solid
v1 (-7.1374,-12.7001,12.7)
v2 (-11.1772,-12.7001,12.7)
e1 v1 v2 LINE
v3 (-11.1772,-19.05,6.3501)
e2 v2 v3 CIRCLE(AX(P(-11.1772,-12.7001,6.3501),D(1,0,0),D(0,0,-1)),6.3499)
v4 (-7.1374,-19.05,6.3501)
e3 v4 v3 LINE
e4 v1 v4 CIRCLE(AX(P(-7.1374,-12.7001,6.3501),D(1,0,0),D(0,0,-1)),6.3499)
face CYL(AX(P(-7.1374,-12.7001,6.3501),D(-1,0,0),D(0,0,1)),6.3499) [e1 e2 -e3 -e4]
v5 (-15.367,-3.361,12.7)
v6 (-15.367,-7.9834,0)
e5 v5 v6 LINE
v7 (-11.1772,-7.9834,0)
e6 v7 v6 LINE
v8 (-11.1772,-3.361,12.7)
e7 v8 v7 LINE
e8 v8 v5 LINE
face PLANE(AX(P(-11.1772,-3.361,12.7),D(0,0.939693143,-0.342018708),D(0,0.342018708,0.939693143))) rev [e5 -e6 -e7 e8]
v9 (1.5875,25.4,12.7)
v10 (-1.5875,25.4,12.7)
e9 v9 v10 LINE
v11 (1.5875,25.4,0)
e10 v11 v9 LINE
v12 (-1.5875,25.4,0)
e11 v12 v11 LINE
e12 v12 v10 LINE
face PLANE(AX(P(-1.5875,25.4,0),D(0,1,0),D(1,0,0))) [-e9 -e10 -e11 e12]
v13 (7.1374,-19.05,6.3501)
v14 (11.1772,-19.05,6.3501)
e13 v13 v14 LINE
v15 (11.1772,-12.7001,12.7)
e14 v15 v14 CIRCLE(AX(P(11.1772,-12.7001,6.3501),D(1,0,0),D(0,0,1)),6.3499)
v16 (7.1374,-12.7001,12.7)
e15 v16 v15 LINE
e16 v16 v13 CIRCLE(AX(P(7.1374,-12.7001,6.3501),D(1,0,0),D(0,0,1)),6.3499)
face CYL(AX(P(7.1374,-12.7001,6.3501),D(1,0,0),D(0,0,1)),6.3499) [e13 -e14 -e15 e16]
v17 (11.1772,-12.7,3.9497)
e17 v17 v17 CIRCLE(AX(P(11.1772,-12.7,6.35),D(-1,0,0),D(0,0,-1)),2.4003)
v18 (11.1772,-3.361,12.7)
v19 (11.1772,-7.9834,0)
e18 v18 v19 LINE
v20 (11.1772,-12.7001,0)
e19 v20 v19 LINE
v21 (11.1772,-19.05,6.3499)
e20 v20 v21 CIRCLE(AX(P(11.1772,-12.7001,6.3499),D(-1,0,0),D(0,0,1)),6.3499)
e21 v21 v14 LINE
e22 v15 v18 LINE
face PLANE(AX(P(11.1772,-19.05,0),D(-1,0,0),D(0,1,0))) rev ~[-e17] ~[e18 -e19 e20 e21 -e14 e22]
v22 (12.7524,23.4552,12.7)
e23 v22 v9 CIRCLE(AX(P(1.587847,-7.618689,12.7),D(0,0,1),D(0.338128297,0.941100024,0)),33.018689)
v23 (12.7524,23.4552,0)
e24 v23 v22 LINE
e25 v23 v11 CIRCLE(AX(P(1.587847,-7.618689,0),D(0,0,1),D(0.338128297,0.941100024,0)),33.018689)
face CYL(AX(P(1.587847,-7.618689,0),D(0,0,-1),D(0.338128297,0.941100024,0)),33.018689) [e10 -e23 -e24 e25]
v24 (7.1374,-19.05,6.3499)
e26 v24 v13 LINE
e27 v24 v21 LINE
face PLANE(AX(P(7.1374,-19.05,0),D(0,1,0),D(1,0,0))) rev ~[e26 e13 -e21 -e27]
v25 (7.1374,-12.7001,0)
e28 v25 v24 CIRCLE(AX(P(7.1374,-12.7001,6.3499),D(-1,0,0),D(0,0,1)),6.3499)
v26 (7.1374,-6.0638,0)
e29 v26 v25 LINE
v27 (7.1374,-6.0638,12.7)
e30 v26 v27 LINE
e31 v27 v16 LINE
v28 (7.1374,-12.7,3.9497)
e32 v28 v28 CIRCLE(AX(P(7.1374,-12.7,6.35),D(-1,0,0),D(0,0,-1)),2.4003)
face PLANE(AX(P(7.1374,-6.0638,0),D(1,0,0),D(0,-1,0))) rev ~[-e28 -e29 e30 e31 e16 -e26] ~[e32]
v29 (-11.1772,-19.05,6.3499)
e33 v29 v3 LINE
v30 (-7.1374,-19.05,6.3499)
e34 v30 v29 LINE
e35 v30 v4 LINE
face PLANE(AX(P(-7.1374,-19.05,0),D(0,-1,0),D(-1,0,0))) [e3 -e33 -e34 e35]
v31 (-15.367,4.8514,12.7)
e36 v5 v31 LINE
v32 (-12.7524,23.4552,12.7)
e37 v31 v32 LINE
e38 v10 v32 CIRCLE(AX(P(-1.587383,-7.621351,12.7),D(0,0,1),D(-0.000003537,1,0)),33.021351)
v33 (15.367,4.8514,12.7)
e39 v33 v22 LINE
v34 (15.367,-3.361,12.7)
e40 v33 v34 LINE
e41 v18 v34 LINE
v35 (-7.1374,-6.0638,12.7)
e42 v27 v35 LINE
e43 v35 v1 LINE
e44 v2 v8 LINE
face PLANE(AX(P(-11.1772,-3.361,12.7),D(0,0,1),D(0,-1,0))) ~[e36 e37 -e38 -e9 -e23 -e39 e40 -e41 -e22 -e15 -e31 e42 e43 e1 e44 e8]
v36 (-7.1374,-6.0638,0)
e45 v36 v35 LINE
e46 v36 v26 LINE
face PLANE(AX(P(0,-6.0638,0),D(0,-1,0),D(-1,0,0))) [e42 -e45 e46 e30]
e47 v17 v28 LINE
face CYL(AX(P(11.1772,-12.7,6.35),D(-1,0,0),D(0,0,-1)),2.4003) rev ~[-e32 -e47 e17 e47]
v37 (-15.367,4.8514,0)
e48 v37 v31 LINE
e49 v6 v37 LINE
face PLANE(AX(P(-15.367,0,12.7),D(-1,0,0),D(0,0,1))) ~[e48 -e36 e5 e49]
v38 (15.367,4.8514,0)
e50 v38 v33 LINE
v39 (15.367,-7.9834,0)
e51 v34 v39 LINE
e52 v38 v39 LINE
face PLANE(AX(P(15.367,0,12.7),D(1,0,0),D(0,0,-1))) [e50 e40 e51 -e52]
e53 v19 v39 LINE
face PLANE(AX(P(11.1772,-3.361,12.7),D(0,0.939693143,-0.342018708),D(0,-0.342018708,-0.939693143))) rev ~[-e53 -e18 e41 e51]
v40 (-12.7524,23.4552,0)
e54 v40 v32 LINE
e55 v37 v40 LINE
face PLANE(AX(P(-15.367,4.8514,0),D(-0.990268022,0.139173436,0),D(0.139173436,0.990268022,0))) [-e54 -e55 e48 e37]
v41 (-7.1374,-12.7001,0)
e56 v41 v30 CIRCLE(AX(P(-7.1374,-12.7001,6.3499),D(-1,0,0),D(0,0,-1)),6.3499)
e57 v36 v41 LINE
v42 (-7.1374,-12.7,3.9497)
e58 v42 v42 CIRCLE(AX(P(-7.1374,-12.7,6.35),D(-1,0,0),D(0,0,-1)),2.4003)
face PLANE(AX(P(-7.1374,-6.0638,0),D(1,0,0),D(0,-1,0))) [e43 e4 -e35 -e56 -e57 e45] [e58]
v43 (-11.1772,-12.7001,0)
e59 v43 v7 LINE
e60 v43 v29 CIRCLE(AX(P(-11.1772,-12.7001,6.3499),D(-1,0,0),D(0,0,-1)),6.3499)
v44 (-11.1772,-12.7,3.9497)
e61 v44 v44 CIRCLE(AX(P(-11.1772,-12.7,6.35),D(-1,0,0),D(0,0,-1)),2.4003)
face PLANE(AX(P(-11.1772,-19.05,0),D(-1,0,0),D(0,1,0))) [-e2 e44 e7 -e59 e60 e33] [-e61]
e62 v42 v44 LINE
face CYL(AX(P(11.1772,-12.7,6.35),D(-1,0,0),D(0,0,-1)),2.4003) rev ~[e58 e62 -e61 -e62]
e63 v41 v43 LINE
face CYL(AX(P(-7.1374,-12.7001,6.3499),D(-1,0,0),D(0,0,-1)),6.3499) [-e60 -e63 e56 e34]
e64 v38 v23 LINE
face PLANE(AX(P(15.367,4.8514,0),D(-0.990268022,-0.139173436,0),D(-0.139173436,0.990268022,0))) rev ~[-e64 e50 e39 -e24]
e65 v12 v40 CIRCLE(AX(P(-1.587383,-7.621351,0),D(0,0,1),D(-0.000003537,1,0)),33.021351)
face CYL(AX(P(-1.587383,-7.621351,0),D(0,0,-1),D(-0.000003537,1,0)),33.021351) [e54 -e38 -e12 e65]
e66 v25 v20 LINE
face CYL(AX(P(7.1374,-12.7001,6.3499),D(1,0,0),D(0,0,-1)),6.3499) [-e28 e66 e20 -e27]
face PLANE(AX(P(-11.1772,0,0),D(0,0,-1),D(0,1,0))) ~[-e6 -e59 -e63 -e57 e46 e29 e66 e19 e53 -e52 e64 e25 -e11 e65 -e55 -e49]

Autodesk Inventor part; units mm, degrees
ref_plane "YZ Plane" through (0, 0, 0) normal (1, 0, 0) x (0, 1, 0)
ref_plane "XY Plane" through (0, 0, 0) normal (0, 0, 1) x (1, 0, 0)
sketch "Sketch1" plane through (0, 0, 0) normal (0, 0, 1) x (1, 0, 0)
  line L0 (0, -6.0638) -> (7.1374, -6.0638)
  line L1 (7.1374, -6.0638) -> (7.1374, -19.05)
  line L2 (7.1374, -19.05) -> (11.1772, -19.05)
  line L3 (11.1772, -19.05) -> (11.1772, 0)
  line L4 (11.1772, 0) -> (15.367, 0)
  line L5 (15.367, 0) -> (15.367, 4.8514)
  line L6 (15.367, 4.8514) -> (12.7524, 23.4552)
  arc A0 (12.7524, 23.4552) -> (1.5875, 25.4) centre (1.5875, -7.62) ccw
  line L7 (-21.5138, 0) -> (21.5138, 0) construction
  line L8 (0, -28.0365) -> (0, 34.8691) construction
  line L9 (0, -6.0638) -> (-7.1374, -6.0638)
  line L10 (-7.1374, -6.0638) -> (-7.1374, -19.05)
  line L11 (-7.1374, -19.05) -> (-11.1772, -19.05)
  line L12 (-11.1772, -19.05) -> (-11.1772, 0)
  line L13 (-11.1772, 0) -> (-15.367, 0)
  line L14 (-15.367, 0) -> (-15.367, 4.8514)
  line L15 (-15.367, 4.8514) -> (-12.7524, 23.4552)
  line L16 (7.1374, -12.7) -> (11.1772, -12.7) construction
  line L17 (-7.1374, -12.7) -> (-11.1772, -12.7) construction
  line L18 (1.5875, 25.4) -> (0, 25.4)
  arc A1 (-1.5875, 25.4) -> (-12.7524, 23.4552) centre (-1.5875, -7.62) ccw
  line L19 (-1.5875, 25.4) -> (0, 25.4)
  point P0 (0, 0)
  dimension "d1" = 30.734
  dimension "d2" = 4.1898
  dimension "d3" = 4.0398
  dimension "d4" = 6.35
  dimension "d5" = 12.7
  dimension "d6" = 17.5514
  dimension "d7" = 8
  dimension "d8" = 1.5875
  dimension "d9" = 38.1
  dimension "d10" = 33.02
extrude "Extrusion1" add sketch "Sketch1" along normal blind 12.7
hole "Hole1" at (11.1772, -12.7, 6.35) direction (-1, 0, 0) diameter 4.8006 end through all
fillet "Fillet1" radius 6.35 4 edges at (9.1573, -19.05, 12.7) (9.1573, -19.05, 0) (-9.1573, -19.05, 12.7) (-9.1573, -19.05, 0)
sketch "Sketch2" plane through (11.1772, 0, 12.7) normal (1, 0, 0) x (0, 0, -1)
  line L0 (12.7, 0) -> (0, 0) projected
  line L1 (0, -12.7) -> (0, 0) construction
  line L2 (12.7, -12.7) -> (12.7, 0) construction
  line L3 (0, -3.361) -> (12.7, -7.9834)
  line L4 (12.7, 0) -> (12.7, -7.9834)
  line L5 (0, -3.361) -> (0, 0)
  point P0 (6.35, -12.7)
  dimension "d23" = 6.604
  dimension "d24" = 20
extrude "Extrusion2" add sketch "Sketch2" along normal up to surface (4.1898 mm away)
mirror "Mirror1" about plane through (0, 0, 0) normal (1, 0, 0) of "Extrusion2"
ref_plane "Work Plane1" through (0, 0, 6.35) normal (0, 0, -1) x (-1, 0, 0)
ref_plane "Work Plane2" through (11.1772, -12.7, 0) normal (0, 1, 0) x (-1, 0, 0)
equation "\"d1\" = finger_w"
equation "\"d2\" = finger_link_w + tol"
equation "\"d3\" = finger_link_w - tol"
equation "\"d4\" = 0.5 * finger_t"
equation "\"d11\" = finger_t"
equation "\"d15\" = bore_clearance"
equation "\"d22\" = 0.5 * finger_t"
equation "\"d25\" = finger_t"
equation "\"finger_A_l\" = 57.15"
equation "\"finger_w\" = 30.734"
equation "\"finger_B_l\" = 38.1"
equation "\"finger_link_w\" = 4.1148"
equation "\"tolerance1\" = 0.15"
equation "\"tol\" = 0.5 * tolerance1"
equation "\"finger_t\" = 12.7"
equation "\"bore_press\" = 4.8006"
equation "\"bore_clearance\" = bore_press"
properties part number "finger_tip"
